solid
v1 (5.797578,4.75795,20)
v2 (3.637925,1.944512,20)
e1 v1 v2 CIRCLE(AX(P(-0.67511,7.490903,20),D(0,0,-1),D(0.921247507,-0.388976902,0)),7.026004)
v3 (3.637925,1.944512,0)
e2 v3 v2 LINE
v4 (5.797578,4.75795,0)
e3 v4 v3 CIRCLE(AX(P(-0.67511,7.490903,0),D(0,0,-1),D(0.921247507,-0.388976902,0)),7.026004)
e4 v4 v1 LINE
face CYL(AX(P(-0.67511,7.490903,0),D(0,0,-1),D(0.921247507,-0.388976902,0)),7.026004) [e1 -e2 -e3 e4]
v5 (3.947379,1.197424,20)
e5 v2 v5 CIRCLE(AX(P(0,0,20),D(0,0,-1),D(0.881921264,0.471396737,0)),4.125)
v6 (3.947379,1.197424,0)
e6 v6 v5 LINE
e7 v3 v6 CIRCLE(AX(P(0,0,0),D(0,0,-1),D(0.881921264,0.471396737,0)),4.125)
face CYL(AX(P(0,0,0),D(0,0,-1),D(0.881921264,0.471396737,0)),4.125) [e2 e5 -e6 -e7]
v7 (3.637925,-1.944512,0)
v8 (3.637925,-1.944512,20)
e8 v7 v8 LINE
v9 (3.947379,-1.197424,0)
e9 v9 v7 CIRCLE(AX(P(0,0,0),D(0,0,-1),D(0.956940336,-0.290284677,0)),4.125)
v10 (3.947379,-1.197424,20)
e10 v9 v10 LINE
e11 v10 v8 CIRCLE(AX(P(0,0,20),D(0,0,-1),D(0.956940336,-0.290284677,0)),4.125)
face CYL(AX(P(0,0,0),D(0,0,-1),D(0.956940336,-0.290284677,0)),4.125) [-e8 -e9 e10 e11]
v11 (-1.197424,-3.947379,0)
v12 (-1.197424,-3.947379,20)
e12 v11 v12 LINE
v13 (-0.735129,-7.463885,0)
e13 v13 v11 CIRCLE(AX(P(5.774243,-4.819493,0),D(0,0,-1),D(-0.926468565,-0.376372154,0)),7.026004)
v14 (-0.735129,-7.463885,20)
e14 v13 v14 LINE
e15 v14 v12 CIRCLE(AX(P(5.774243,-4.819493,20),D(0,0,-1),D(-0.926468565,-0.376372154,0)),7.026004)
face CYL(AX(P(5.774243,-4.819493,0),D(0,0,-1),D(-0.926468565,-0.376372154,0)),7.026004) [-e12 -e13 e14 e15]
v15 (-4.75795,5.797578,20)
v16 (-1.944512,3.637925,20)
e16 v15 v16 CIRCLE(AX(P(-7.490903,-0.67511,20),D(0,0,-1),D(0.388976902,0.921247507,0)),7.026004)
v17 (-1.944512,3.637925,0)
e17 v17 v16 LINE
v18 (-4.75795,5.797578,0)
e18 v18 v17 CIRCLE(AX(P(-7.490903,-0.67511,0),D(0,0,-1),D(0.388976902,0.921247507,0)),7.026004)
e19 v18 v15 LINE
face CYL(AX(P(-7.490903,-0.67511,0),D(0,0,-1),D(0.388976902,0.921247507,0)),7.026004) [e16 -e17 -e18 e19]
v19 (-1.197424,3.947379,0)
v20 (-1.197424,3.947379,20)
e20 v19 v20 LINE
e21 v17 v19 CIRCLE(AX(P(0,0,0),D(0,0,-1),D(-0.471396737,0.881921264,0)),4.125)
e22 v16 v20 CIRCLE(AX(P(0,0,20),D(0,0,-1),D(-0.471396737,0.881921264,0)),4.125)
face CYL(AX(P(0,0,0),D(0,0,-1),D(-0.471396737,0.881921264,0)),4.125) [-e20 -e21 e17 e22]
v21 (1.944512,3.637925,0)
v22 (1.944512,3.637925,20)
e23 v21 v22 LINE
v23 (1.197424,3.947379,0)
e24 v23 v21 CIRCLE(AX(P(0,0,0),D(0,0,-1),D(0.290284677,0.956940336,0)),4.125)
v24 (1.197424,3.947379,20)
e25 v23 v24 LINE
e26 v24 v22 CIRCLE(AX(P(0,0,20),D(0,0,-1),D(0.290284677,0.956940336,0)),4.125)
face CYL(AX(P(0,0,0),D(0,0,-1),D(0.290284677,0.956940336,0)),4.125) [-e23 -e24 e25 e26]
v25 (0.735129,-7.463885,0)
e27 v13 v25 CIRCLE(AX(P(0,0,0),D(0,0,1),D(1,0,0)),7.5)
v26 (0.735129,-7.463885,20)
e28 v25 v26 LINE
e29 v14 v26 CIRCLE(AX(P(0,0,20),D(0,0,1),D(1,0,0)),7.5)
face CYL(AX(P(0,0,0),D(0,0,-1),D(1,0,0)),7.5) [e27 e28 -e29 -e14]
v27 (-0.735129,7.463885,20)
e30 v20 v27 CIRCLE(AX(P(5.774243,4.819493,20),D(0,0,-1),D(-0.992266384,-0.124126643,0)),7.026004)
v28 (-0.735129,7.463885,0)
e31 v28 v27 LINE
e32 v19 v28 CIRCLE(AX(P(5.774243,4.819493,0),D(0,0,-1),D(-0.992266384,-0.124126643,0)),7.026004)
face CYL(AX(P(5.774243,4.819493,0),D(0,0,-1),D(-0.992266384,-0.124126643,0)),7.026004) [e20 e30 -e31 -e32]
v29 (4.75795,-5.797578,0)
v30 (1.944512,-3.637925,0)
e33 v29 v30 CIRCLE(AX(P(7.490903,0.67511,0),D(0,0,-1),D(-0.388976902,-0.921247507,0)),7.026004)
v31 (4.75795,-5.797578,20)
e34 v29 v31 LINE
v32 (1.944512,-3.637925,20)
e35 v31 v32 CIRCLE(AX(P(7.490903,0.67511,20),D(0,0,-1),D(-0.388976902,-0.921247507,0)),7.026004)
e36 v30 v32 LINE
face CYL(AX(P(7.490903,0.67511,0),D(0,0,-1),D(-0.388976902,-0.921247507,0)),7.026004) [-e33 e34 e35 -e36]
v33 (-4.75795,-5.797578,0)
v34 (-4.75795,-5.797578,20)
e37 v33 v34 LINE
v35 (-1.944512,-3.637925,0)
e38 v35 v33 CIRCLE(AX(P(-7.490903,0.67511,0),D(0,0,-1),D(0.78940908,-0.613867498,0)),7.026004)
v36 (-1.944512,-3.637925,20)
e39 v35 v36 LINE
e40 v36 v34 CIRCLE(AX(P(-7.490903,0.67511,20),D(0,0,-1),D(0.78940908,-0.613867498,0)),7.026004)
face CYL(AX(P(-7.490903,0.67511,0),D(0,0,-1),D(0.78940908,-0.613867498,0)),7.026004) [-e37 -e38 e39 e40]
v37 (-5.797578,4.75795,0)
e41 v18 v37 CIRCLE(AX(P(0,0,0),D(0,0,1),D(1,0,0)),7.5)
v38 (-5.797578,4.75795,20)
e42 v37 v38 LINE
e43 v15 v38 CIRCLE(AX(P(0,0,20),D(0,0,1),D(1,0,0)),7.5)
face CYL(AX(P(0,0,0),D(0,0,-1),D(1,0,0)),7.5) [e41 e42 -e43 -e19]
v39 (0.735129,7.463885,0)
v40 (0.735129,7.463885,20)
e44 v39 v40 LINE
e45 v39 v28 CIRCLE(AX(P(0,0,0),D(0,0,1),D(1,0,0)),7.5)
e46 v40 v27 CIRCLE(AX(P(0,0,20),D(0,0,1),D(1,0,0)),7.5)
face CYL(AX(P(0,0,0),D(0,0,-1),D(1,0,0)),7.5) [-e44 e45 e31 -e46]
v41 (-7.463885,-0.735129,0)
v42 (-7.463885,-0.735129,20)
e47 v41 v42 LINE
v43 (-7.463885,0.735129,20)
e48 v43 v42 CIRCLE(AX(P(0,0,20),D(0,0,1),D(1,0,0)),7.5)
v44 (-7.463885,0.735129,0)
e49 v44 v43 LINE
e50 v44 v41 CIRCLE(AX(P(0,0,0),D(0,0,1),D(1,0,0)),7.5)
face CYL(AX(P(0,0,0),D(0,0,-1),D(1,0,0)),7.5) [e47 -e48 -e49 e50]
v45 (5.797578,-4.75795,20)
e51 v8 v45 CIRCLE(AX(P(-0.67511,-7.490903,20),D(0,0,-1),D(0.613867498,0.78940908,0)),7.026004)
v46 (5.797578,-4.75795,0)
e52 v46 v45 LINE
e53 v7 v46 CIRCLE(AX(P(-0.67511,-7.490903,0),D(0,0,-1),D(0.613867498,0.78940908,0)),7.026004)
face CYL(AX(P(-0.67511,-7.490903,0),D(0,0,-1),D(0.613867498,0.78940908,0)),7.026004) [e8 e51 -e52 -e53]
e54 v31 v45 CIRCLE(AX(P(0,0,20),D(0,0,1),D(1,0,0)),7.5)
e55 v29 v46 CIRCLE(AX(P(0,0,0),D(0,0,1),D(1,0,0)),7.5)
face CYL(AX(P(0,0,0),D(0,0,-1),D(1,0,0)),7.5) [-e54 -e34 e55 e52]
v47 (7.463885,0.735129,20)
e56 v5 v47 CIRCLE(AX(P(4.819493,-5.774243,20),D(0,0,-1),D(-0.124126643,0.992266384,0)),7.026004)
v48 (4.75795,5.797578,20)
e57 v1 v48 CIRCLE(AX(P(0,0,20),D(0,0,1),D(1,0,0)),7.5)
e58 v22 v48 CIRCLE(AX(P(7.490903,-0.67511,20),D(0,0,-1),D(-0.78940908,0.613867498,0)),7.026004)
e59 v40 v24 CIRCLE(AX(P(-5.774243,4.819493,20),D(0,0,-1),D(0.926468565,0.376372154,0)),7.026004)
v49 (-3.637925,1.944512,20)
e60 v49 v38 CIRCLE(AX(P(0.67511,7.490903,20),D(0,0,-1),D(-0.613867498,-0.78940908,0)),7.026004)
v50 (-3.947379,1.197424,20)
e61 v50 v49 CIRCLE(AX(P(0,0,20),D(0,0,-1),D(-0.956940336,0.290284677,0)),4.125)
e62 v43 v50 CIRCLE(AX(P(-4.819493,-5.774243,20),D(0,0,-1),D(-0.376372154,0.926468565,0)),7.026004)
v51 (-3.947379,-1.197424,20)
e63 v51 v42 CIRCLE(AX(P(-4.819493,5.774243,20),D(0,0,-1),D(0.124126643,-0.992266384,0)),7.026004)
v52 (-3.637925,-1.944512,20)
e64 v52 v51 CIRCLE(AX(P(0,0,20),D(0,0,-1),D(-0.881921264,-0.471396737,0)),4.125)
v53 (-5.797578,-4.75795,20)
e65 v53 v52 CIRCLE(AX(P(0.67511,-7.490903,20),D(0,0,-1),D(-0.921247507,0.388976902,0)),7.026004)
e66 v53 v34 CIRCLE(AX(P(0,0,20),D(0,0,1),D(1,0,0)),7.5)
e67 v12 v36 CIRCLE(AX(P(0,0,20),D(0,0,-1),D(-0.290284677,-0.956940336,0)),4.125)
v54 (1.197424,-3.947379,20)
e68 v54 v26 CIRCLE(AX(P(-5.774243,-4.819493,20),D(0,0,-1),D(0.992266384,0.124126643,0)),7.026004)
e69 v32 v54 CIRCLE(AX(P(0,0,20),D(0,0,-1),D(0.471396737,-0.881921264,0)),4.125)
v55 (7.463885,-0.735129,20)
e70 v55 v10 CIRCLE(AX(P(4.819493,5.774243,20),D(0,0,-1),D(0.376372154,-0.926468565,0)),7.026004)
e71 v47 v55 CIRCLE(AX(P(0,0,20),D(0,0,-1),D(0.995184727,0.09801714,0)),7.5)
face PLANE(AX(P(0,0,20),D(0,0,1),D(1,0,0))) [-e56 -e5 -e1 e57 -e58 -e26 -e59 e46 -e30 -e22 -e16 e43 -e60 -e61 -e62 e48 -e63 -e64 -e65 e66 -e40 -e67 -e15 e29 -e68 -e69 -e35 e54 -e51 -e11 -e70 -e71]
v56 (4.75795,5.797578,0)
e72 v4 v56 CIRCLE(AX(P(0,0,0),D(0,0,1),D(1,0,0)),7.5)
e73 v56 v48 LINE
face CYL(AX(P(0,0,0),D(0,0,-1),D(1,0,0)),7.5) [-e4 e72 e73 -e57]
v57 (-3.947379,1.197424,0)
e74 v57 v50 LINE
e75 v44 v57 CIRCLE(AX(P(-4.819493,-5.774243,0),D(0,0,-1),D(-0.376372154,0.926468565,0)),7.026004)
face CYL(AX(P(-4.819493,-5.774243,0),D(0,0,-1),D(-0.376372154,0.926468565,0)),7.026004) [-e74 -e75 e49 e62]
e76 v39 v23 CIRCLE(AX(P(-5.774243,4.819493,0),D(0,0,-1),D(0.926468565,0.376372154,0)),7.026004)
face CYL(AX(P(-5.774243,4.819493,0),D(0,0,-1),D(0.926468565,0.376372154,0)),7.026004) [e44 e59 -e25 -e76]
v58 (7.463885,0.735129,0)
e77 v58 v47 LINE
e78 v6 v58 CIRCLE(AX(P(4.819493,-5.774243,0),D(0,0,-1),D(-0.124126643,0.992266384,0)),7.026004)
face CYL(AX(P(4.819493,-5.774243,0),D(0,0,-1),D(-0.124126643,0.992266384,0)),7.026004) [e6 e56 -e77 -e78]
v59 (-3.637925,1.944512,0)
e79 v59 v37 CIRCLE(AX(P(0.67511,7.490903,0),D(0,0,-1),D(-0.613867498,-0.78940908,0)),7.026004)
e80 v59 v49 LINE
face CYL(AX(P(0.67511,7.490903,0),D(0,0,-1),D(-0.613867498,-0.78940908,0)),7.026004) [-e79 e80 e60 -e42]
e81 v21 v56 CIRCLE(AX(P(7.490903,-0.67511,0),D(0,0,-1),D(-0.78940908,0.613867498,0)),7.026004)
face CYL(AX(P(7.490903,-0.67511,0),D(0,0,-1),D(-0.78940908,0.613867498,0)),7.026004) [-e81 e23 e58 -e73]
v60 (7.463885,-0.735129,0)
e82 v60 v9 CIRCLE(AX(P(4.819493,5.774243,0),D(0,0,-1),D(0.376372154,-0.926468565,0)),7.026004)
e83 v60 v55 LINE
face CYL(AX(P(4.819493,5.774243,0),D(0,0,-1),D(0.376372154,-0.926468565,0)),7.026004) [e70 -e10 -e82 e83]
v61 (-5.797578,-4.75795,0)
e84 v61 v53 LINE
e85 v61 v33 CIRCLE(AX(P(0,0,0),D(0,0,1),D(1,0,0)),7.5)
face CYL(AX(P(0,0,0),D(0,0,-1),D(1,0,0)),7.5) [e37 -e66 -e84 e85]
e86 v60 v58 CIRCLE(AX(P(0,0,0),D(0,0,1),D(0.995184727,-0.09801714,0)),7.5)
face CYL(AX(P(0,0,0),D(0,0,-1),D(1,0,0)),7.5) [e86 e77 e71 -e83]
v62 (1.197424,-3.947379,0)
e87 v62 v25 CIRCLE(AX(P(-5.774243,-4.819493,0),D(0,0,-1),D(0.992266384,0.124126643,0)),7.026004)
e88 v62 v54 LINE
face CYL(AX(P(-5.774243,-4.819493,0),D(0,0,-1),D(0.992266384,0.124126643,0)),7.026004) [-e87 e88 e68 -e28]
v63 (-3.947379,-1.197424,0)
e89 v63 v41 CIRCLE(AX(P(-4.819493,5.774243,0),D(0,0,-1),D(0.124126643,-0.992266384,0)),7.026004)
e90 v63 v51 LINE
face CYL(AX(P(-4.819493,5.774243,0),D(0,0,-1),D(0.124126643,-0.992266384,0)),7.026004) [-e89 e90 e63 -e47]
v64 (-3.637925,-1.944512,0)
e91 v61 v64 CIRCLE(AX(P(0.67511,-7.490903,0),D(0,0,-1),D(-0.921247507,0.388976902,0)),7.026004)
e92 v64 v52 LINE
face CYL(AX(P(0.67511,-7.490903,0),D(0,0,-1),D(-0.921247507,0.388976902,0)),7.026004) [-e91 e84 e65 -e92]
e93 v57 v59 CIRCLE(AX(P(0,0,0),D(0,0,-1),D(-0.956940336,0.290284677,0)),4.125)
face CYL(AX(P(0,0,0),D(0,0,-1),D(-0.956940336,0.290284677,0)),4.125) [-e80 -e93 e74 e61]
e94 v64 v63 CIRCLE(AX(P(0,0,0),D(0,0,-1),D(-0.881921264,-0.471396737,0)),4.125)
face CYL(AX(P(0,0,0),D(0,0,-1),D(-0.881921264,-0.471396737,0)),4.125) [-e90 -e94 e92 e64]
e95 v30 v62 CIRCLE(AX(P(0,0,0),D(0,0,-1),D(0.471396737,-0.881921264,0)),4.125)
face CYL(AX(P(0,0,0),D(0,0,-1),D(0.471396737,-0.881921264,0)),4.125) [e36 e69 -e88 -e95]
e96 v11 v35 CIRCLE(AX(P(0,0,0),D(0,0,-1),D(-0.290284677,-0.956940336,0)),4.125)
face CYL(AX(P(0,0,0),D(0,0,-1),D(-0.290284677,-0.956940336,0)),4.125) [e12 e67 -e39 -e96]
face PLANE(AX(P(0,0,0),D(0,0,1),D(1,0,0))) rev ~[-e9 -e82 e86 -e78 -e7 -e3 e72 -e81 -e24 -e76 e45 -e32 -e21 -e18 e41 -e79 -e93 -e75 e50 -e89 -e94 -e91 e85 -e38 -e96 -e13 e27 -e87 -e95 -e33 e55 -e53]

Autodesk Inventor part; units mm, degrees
sketch "Sketch1" plane through (0, 0, 0) normal (0, 0, 1) x (1, 0, 0)
  circle A0 centre (0, 0) radius 7.5
  dimension "d0" = 15
extrude "Extrusion1" add sketch "Sketch1" along normal blind 20
ref_plane "Work Plane2" through (0, 0, 10) normal (0, 0, 1) x (1, 0, 0)
sketch "Sketch2" plane through (0, 0, 0) normal (0, 0, -1) x (-1, 0, 0)
  circle A0 centre (0, 0) radius 7.5 projected
  circle A1 centre (0, 0) radius 6
  dimension "d3" = 12
surface extrude "Pitch Diameter" sketch "Sketch2" against normal through all shown no curves A1
ref_plane "Work Plane8" through (0, 0, 0) normal (0.9238795, 0.3826834, 0) x (0, 0, 1)
ref_plane "Work Plane9" through (0, 0, 0) normal (1, 0, 0) x (0, 1, 0)
spur gear teeth "Spur Gear" teeth 8 pitch diameter 12 tip diameter 15 root diameter 8.25 face width 20 start plane through (0, 0, 0) normal (0, 0, -1) x (-1, 0, 0)
equation "\"d0\" = da_da"
equation "\"d1\" = da_b"
equation "\"d3\" = da_d"
equation "\"d16\" = da_aw"
equation "\"d43\" = da_aw"
equation "\"d46\" = da_aw"
equation "\"da_da\" = 15"
equation "\"da_b\" = 20"
equation "\"da_d\" = 12"
equation "\"da_aw\" = 12"
properties part number "Spur Gear1" material "Steel"
